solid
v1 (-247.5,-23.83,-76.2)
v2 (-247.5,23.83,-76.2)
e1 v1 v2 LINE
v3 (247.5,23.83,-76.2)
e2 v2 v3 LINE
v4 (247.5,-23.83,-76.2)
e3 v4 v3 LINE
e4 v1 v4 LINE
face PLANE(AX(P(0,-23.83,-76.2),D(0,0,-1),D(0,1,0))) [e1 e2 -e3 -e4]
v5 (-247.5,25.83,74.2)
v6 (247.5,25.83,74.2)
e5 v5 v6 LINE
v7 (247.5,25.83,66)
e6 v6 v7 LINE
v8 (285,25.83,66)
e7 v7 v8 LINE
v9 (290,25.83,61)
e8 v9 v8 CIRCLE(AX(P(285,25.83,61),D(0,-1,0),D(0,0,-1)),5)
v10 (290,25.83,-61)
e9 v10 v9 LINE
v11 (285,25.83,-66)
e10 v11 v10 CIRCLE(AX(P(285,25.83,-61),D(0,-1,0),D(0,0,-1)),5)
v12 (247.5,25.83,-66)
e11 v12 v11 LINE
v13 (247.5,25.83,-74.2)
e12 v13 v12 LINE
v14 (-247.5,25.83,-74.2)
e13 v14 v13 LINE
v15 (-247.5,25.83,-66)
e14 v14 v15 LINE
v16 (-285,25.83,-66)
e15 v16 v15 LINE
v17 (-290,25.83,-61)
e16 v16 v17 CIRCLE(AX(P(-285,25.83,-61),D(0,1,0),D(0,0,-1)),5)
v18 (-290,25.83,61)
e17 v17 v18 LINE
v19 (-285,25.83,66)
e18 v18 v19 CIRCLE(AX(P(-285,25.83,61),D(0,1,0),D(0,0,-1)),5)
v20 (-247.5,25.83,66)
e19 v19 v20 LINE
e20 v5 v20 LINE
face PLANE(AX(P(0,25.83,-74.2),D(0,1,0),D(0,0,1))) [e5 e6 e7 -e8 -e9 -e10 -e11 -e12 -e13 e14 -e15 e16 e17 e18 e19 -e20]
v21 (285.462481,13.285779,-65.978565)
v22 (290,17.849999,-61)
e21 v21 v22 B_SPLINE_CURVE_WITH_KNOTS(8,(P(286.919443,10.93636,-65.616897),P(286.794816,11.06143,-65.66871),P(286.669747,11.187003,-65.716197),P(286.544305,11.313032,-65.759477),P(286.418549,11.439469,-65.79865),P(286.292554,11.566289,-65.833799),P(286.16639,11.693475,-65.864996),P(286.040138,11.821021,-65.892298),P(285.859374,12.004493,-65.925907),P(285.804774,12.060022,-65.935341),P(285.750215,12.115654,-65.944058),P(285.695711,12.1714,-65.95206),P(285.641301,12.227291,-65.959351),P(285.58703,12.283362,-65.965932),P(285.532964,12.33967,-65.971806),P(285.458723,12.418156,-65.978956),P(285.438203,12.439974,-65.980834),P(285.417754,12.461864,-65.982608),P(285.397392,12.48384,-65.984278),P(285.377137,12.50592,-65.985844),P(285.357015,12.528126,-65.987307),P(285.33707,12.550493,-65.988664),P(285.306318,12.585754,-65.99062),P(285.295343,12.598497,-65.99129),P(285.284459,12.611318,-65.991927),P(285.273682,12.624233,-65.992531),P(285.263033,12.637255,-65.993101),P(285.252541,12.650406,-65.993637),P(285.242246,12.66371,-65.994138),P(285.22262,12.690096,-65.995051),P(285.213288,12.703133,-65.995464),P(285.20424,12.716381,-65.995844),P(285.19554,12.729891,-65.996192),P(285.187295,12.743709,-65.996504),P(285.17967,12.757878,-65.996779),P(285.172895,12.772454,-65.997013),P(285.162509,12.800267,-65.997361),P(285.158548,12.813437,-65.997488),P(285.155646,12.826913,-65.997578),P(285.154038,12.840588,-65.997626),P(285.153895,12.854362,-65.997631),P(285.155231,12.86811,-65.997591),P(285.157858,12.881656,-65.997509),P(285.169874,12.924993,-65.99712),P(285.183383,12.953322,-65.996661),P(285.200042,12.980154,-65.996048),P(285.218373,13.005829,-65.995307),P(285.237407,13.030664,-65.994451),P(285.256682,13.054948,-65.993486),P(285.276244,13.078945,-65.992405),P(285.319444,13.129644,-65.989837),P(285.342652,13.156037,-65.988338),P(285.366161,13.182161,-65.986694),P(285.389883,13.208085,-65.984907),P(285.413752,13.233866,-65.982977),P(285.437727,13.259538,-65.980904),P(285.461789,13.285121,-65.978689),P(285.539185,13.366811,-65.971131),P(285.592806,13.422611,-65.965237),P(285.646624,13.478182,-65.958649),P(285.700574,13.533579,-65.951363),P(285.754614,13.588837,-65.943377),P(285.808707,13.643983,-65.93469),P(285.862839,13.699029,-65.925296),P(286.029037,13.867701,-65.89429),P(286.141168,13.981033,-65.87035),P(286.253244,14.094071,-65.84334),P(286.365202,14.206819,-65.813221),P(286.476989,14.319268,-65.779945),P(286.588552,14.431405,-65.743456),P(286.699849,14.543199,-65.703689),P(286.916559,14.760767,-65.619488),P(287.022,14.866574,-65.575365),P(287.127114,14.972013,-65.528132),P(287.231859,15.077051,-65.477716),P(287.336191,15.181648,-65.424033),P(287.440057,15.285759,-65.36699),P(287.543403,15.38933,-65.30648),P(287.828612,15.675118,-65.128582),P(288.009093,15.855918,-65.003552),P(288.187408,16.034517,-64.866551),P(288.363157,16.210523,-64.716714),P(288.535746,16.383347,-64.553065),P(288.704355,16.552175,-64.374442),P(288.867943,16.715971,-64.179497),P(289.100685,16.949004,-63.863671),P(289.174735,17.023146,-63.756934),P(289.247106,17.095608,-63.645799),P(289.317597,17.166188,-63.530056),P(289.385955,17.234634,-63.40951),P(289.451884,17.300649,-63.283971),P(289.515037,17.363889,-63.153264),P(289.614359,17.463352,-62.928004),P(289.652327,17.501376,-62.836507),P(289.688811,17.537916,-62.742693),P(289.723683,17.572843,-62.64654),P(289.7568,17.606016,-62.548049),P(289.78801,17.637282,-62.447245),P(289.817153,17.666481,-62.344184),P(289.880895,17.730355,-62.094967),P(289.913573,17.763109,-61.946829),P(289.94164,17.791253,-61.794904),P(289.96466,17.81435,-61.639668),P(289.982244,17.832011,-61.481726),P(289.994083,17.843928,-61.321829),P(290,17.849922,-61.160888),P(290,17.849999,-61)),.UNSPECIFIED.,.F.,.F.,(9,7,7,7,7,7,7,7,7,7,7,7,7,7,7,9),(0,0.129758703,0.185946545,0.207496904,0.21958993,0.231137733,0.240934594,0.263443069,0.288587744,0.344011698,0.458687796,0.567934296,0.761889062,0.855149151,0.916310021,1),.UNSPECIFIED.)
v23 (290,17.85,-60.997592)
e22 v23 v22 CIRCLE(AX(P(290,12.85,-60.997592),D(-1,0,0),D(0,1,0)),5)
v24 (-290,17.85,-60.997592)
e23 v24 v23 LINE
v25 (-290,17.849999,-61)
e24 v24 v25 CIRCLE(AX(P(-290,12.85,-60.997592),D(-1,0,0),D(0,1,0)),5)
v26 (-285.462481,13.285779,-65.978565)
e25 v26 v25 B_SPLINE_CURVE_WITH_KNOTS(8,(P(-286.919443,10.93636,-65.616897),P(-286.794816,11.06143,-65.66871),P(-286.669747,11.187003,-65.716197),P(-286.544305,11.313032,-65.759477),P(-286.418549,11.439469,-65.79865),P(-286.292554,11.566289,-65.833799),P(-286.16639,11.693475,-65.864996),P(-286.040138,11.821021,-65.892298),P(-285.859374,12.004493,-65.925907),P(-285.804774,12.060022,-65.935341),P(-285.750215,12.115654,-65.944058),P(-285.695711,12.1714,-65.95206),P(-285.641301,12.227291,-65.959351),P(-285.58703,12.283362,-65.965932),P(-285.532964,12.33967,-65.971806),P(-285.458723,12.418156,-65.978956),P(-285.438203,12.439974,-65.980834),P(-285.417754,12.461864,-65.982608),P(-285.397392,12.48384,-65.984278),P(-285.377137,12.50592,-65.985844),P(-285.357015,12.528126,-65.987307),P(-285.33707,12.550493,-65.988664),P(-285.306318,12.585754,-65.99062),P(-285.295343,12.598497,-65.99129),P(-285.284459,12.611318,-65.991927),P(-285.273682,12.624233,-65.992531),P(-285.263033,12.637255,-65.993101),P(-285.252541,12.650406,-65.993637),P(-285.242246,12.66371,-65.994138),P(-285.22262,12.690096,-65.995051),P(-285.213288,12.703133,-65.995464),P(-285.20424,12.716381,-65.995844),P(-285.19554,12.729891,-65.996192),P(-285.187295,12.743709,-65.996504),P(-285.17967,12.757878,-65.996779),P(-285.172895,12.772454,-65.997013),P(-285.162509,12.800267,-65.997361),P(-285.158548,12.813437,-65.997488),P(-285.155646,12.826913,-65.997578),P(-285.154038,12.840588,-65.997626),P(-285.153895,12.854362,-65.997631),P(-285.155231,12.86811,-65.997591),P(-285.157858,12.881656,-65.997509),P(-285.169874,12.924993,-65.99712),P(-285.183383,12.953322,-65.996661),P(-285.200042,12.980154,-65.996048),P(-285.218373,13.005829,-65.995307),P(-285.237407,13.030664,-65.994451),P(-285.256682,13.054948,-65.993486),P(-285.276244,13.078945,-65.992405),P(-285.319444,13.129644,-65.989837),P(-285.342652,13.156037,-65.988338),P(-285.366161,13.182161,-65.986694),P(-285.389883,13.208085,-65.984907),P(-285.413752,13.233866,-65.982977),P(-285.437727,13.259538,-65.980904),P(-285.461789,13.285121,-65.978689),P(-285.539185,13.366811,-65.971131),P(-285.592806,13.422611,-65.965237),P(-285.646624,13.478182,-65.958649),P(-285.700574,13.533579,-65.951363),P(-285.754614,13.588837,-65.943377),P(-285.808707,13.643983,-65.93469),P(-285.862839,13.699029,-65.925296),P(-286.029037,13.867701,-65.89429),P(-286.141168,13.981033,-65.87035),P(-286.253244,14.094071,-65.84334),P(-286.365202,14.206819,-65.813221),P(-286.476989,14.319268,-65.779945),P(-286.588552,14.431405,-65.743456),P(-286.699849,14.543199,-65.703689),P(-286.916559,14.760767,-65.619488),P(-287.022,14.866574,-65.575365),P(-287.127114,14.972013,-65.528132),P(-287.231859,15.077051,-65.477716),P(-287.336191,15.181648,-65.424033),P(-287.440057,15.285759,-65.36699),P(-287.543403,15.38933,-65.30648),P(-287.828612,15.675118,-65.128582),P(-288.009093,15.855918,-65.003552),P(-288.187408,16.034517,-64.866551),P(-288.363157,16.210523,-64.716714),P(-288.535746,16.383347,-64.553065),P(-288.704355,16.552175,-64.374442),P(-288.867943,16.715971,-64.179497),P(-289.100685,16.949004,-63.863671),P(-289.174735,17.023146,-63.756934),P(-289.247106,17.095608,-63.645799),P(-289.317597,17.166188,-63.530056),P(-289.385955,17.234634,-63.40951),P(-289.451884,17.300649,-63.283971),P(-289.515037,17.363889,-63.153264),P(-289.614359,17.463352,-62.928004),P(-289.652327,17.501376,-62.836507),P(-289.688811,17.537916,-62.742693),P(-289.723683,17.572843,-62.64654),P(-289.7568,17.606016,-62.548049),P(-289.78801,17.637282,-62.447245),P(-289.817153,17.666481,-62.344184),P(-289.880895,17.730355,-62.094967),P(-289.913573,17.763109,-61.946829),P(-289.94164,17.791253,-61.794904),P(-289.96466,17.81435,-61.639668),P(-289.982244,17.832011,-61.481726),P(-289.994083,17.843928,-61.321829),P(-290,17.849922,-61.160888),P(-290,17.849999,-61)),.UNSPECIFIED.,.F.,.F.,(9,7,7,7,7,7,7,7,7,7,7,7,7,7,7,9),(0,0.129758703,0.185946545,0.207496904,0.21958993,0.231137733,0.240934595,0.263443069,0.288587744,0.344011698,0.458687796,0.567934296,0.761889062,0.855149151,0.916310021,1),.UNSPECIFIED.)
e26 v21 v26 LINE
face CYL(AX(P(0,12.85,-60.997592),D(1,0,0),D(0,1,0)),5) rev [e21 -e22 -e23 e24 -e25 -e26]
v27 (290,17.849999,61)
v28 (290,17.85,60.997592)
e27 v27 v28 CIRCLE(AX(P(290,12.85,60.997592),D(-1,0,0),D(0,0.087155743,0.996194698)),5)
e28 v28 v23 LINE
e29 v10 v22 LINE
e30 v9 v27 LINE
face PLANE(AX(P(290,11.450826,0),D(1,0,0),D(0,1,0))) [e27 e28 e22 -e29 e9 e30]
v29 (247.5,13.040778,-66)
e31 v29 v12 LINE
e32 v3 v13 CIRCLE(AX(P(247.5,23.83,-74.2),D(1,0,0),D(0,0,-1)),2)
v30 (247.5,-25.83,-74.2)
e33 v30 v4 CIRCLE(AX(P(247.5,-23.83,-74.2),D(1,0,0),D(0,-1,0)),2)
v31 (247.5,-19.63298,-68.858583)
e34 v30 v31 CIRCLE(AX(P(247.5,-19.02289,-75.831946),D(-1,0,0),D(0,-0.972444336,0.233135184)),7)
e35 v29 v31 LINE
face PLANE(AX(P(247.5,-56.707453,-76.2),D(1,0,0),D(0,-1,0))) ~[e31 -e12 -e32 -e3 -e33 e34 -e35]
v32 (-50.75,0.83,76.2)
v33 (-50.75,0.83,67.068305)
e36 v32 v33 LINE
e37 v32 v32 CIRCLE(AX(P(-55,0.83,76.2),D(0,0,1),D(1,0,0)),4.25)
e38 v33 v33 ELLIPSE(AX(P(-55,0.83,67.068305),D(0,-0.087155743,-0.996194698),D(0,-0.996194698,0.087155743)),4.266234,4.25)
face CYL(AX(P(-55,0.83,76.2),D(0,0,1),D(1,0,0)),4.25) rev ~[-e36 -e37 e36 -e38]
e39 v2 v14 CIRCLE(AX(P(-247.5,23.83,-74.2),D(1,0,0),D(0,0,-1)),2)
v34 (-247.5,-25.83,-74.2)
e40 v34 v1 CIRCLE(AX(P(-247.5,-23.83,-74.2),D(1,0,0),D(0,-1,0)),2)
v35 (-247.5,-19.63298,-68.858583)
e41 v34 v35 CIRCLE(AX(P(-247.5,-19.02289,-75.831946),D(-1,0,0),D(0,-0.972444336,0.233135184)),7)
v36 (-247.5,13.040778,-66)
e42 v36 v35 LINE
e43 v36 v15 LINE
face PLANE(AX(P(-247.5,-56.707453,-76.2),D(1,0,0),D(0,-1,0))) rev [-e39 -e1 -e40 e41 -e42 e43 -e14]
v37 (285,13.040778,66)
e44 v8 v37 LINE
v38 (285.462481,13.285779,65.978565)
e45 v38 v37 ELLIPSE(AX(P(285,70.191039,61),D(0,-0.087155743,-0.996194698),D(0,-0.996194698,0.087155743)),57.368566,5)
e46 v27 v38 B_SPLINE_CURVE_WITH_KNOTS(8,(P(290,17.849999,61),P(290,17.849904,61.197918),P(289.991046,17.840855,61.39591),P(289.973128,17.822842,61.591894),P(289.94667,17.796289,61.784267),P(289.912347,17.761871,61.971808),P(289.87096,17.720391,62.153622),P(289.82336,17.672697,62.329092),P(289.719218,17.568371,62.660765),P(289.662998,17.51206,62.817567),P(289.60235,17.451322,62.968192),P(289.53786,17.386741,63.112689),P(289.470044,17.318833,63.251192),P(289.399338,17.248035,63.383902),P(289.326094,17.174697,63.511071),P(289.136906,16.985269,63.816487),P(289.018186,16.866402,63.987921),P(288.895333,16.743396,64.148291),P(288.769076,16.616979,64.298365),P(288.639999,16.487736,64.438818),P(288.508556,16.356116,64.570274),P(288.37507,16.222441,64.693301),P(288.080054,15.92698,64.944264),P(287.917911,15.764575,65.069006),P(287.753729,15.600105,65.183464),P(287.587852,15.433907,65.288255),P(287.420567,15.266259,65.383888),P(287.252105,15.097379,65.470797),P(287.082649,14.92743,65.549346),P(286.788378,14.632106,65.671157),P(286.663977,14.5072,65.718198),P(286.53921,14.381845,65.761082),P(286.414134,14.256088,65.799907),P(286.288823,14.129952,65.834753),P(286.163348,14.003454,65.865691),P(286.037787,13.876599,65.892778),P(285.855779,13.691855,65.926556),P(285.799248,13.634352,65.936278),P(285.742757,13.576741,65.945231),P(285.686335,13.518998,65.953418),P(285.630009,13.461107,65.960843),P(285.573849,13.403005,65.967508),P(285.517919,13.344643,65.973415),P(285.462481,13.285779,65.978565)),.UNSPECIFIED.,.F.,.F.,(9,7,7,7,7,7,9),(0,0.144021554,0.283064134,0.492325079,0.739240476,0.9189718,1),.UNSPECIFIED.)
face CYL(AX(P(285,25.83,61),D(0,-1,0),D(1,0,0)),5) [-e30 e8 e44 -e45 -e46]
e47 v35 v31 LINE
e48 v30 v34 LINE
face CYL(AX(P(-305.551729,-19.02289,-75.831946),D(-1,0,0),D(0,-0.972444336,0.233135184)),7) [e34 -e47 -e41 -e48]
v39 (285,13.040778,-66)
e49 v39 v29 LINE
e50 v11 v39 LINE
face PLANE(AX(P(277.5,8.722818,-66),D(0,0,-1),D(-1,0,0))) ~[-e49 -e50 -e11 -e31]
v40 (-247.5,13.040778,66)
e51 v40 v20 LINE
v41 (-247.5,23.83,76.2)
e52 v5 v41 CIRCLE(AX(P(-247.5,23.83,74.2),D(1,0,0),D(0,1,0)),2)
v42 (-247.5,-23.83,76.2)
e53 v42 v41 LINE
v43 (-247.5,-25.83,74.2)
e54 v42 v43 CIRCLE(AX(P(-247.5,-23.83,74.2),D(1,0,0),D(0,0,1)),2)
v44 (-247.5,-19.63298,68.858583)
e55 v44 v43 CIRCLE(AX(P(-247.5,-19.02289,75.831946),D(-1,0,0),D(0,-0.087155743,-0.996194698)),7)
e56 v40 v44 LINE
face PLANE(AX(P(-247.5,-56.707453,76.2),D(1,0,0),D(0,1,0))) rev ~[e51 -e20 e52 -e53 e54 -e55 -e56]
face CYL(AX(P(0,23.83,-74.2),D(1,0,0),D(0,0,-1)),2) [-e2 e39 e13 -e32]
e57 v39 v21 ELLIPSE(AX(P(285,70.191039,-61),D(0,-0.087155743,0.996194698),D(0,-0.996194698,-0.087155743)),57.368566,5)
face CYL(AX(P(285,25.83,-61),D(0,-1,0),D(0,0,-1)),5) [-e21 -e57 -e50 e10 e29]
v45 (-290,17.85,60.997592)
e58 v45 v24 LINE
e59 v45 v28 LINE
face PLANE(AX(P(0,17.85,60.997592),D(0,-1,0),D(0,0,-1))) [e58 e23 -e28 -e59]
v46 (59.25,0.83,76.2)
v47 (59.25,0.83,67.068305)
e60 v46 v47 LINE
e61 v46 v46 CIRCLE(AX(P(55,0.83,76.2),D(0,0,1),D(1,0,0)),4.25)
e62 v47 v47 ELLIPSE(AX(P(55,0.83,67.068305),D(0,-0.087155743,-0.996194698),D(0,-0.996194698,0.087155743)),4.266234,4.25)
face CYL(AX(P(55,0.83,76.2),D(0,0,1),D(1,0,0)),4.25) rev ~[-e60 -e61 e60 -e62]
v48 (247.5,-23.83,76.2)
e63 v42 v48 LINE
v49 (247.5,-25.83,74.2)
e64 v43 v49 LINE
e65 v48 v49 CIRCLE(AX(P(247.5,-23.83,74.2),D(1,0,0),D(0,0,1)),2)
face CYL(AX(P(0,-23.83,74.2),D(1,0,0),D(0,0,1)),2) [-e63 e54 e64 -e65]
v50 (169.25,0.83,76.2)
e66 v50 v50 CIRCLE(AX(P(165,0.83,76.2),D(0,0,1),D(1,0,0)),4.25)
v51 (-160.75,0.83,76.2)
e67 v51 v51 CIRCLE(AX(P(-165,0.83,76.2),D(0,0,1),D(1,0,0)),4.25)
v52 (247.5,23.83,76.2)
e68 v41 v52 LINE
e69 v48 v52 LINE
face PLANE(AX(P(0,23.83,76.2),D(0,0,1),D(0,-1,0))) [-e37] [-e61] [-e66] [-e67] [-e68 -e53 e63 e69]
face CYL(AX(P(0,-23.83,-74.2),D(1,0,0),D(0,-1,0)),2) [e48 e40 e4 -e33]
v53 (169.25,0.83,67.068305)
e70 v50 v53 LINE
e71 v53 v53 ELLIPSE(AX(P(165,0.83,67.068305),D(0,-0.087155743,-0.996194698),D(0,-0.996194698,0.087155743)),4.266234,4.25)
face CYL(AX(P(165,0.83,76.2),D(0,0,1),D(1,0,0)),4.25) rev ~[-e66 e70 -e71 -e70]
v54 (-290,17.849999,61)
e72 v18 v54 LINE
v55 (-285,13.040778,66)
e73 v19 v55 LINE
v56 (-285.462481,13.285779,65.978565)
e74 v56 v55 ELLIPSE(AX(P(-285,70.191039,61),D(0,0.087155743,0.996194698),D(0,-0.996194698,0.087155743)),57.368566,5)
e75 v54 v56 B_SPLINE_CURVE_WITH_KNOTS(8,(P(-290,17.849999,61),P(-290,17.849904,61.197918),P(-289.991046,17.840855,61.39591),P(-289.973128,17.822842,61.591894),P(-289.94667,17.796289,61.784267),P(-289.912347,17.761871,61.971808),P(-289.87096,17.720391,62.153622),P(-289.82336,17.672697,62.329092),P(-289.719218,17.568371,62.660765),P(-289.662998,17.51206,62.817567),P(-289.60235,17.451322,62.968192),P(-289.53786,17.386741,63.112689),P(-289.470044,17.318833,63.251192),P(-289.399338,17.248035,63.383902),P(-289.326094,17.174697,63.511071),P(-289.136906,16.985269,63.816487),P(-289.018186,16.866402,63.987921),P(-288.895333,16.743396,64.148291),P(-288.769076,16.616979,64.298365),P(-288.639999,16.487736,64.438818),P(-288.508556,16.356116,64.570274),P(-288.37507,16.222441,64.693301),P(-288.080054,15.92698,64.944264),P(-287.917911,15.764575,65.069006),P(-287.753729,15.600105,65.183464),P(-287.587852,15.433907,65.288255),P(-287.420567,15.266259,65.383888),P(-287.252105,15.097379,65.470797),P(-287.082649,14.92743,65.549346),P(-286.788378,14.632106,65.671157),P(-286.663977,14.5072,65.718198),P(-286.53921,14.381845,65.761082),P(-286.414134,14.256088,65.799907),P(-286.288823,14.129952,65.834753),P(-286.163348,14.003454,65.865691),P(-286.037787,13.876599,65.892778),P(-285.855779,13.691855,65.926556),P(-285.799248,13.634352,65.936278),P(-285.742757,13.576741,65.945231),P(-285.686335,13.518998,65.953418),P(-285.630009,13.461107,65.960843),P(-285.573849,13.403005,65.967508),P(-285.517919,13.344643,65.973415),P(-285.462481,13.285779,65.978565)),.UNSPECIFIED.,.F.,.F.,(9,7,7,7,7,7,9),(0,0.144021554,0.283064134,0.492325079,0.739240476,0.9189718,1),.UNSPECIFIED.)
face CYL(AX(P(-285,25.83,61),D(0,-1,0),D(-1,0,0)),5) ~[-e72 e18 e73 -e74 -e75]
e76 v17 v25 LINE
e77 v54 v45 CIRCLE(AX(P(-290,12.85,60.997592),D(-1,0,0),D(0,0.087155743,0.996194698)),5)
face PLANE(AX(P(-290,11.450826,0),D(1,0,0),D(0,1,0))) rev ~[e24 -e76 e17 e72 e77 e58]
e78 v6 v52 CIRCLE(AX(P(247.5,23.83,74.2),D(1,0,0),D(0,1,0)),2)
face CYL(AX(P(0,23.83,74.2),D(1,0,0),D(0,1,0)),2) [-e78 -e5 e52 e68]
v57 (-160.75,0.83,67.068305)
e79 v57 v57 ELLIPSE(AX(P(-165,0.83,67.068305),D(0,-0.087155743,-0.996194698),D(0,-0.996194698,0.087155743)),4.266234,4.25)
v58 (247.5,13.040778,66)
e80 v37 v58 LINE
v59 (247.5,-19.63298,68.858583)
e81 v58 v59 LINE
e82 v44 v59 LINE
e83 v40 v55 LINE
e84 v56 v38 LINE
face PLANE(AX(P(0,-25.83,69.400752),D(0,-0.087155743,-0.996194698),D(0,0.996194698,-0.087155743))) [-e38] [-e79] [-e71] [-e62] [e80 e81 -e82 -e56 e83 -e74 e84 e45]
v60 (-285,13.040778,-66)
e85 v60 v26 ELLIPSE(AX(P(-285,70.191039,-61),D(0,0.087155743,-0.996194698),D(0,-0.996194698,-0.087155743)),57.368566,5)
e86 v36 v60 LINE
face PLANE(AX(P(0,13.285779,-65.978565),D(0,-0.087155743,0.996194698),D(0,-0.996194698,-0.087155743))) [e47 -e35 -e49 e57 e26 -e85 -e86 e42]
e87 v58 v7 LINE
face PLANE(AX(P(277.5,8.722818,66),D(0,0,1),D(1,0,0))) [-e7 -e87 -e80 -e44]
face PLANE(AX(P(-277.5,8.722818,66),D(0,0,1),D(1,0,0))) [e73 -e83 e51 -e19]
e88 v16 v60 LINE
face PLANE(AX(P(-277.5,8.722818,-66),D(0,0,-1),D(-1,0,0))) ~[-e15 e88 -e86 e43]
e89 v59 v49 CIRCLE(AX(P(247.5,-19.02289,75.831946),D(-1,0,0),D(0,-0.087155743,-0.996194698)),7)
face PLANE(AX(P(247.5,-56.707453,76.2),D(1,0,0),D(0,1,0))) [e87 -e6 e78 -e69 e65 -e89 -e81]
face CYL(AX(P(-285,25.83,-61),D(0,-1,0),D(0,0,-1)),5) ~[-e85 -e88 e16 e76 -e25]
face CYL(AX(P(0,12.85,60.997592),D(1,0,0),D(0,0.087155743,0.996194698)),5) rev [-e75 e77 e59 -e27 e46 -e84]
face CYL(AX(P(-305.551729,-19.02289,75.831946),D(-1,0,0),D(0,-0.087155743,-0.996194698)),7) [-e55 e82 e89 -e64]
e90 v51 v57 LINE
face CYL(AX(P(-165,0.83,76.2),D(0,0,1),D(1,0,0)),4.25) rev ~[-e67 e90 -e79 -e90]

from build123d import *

# Parameters (mm, degrees)
F1_DEPTH    = 290
F2_T1_DEPTH = 611.1034588044
F3_R        = 4.25
F4_DEPTH    = 25
F5_W        = 60
F5_H        = 130.8605410159
F6_DEPTH    = 10.2
F7_R        = 5


# Not quite as in the source:
# - a fillet or chamfer that OpenCascade refuses, or shapes differently, is made with other operations: its cross-section is extruded or revolved along the edge and cut away or added
# - a pattern or mirror of a feature is missing from the dataset's text; its kind, count and spacing are read off the source's solid


with BuildPart() as f1:
    # F0 (on Right) → F1 (new body, symmetric)
    with BuildSketch(Plane.YZ):
        with BuildLine():
            ThreePointArc((-25.83, -74.2), (-25.2442135624, -75.6142135624), (-23.83, -76.2))
            Line((-23.83, -76.2), (23.83, -76.2))
            ThreePointArc((23.83, -76.2), (25.2442135624, -75.6142135624), (25.83, -74.2))
            Line((25.83, -74.2), (25.83, 74.2))
            ThreePointArc((25.83, 74.2), (25.2442135624, 75.6142135624), (23.83, 76.2))
            Line((23.83, 76.2), (-23.83, 76.2))
            ThreePointArc((-23.83, 76.2), (-25.2442135624, 75.6142135624), (-25.83, 74.2))
            Line((-25.83, 74.2), (-25.83, 69.4007524114))
            Line((-25.83, 69.4007524114), (13.2857787137, 65.978565209))
            ThreePointArc((13.2857787137, 65.978565209), (16.5363866841, 64.3755427566), (17.85, 60.9975917185))
            Line((17.85, 60.9975917185), (17.85, -60.9975917185))
            ThreePointArc((17.85, -60.9975917185), (16.5363866841, -64.3755427566), (13.2857787137, -65.978565209))
            Line((13.2857787137, -65.978565209), (-25.83, -69.4007524114))
            Line((-25.83, -69.4007524114), (-25.83, -74.2))
        make_face()
    extrude(amount=F1_DEPTH, both=True)

    # F2: fillet of radius 7 on 2 edges, made by hand

    # F2_s2 → F2_t1 (cut)
    with BuildSketch(Plane.YZ.offset(-305.5517294022)):
        with BuildLine():
            ThreePointArc((-25.83, -74.2), (-23.5930536317, -70.5297202282), (-19.6329798493, -68.8585834006))
            Line((-19.6329798493, -68.8585834006), (-19.6451816533, -68.7191161428))
            Line((-19.6451816533, -68.7191161428), (-25.842201804, -69.2612851537))
            Line((-25.842201804, -69.2612851537), (-25.97, -69.4007524114))
            ThreePointArc((-25.97, -69.4007524114), (-25.97, -71.8003762057), (-25.966142207, -74.1673610743))
            Line((-25.966142207, -74.1673610743), (-25.83, -74.2))
        make_face()
        with BuildLine():
            ThreePointArc((-19.6329798493, 68.8585834006), (-23.5930536317, 70.5297202282), (-25.83, 74.2))
            Line((-25.83, 74.2), (-25.966142207, 74.1673610743))
            ThreePointArc((-25.966142207, 74.1673610743), (-25.97, 71.8003762057), (-25.97, 69.4007524114))
            Line((-25.97, 69.4007524114), (-25.842201804, 69.2612851537))
            Line((-25.842201804, 69.2612851537), (-19.6451816533, 68.7191161428))
            Line((-19.6451816533, 68.7191161428), (-19.6329798493, 68.8585834006))
        make_face()
    extrude(amount=F2_T1_DEPTH, mode=Mode.SUBTRACT)

    # F3 (on face) → F4 (cut)
    with BuildSketch(Plane.XY.offset(76.2)):
        with Locations((-275, 0.83)):
            Circle(F3_R)
        with Locations((-165, 0.83)):
            Circle(F3_R)
        with Locations((-55, 0.83)):
            Circle(F3_R)
        with Locations((55, 0.83)):
            Circle(F3_R)
        with Locations((165, 0.83)):
            Circle(F3_R)
        with Locations((275, 0.83)):
            Circle(F3_R)
    extrude(amount=-F4_DEPTH, mode=Mode.SUBTRACT)

    # F5 (on face) → F6 (cut)
    with BuildSketch(Plane.XY.offset(76.2)):
        with Locations((-277.5, 8.7228175253)):
            Rectangle(F5_W, F5_H)
        with Locations((277.5, 8.7228175253)):
            Rectangle(F5_W, F5_H)
    f6 = extrude(amount=-F6_DEPTH, mode=Mode.SUBTRACT)

    # F6_copies: F6 across plane
    add(f6.mirror(Plane(origin=(0, 0, 0), x_dir=(-1, 0, 0), z_dir=(0, 0, -1))), mode=Mode.SUBTRACT)

    # F7
    f7_edges = [f1.edges().sort_by_distance(p)[0] for p in [
        (-290, 19.435389, 66),
        (290, 19.435389, 66),
        (290, 19.435389, -66),
        (-290, 19.435389, -66),
    ]]
    fillet(f7_edges, radius=F7_R)


solid = f1.part
